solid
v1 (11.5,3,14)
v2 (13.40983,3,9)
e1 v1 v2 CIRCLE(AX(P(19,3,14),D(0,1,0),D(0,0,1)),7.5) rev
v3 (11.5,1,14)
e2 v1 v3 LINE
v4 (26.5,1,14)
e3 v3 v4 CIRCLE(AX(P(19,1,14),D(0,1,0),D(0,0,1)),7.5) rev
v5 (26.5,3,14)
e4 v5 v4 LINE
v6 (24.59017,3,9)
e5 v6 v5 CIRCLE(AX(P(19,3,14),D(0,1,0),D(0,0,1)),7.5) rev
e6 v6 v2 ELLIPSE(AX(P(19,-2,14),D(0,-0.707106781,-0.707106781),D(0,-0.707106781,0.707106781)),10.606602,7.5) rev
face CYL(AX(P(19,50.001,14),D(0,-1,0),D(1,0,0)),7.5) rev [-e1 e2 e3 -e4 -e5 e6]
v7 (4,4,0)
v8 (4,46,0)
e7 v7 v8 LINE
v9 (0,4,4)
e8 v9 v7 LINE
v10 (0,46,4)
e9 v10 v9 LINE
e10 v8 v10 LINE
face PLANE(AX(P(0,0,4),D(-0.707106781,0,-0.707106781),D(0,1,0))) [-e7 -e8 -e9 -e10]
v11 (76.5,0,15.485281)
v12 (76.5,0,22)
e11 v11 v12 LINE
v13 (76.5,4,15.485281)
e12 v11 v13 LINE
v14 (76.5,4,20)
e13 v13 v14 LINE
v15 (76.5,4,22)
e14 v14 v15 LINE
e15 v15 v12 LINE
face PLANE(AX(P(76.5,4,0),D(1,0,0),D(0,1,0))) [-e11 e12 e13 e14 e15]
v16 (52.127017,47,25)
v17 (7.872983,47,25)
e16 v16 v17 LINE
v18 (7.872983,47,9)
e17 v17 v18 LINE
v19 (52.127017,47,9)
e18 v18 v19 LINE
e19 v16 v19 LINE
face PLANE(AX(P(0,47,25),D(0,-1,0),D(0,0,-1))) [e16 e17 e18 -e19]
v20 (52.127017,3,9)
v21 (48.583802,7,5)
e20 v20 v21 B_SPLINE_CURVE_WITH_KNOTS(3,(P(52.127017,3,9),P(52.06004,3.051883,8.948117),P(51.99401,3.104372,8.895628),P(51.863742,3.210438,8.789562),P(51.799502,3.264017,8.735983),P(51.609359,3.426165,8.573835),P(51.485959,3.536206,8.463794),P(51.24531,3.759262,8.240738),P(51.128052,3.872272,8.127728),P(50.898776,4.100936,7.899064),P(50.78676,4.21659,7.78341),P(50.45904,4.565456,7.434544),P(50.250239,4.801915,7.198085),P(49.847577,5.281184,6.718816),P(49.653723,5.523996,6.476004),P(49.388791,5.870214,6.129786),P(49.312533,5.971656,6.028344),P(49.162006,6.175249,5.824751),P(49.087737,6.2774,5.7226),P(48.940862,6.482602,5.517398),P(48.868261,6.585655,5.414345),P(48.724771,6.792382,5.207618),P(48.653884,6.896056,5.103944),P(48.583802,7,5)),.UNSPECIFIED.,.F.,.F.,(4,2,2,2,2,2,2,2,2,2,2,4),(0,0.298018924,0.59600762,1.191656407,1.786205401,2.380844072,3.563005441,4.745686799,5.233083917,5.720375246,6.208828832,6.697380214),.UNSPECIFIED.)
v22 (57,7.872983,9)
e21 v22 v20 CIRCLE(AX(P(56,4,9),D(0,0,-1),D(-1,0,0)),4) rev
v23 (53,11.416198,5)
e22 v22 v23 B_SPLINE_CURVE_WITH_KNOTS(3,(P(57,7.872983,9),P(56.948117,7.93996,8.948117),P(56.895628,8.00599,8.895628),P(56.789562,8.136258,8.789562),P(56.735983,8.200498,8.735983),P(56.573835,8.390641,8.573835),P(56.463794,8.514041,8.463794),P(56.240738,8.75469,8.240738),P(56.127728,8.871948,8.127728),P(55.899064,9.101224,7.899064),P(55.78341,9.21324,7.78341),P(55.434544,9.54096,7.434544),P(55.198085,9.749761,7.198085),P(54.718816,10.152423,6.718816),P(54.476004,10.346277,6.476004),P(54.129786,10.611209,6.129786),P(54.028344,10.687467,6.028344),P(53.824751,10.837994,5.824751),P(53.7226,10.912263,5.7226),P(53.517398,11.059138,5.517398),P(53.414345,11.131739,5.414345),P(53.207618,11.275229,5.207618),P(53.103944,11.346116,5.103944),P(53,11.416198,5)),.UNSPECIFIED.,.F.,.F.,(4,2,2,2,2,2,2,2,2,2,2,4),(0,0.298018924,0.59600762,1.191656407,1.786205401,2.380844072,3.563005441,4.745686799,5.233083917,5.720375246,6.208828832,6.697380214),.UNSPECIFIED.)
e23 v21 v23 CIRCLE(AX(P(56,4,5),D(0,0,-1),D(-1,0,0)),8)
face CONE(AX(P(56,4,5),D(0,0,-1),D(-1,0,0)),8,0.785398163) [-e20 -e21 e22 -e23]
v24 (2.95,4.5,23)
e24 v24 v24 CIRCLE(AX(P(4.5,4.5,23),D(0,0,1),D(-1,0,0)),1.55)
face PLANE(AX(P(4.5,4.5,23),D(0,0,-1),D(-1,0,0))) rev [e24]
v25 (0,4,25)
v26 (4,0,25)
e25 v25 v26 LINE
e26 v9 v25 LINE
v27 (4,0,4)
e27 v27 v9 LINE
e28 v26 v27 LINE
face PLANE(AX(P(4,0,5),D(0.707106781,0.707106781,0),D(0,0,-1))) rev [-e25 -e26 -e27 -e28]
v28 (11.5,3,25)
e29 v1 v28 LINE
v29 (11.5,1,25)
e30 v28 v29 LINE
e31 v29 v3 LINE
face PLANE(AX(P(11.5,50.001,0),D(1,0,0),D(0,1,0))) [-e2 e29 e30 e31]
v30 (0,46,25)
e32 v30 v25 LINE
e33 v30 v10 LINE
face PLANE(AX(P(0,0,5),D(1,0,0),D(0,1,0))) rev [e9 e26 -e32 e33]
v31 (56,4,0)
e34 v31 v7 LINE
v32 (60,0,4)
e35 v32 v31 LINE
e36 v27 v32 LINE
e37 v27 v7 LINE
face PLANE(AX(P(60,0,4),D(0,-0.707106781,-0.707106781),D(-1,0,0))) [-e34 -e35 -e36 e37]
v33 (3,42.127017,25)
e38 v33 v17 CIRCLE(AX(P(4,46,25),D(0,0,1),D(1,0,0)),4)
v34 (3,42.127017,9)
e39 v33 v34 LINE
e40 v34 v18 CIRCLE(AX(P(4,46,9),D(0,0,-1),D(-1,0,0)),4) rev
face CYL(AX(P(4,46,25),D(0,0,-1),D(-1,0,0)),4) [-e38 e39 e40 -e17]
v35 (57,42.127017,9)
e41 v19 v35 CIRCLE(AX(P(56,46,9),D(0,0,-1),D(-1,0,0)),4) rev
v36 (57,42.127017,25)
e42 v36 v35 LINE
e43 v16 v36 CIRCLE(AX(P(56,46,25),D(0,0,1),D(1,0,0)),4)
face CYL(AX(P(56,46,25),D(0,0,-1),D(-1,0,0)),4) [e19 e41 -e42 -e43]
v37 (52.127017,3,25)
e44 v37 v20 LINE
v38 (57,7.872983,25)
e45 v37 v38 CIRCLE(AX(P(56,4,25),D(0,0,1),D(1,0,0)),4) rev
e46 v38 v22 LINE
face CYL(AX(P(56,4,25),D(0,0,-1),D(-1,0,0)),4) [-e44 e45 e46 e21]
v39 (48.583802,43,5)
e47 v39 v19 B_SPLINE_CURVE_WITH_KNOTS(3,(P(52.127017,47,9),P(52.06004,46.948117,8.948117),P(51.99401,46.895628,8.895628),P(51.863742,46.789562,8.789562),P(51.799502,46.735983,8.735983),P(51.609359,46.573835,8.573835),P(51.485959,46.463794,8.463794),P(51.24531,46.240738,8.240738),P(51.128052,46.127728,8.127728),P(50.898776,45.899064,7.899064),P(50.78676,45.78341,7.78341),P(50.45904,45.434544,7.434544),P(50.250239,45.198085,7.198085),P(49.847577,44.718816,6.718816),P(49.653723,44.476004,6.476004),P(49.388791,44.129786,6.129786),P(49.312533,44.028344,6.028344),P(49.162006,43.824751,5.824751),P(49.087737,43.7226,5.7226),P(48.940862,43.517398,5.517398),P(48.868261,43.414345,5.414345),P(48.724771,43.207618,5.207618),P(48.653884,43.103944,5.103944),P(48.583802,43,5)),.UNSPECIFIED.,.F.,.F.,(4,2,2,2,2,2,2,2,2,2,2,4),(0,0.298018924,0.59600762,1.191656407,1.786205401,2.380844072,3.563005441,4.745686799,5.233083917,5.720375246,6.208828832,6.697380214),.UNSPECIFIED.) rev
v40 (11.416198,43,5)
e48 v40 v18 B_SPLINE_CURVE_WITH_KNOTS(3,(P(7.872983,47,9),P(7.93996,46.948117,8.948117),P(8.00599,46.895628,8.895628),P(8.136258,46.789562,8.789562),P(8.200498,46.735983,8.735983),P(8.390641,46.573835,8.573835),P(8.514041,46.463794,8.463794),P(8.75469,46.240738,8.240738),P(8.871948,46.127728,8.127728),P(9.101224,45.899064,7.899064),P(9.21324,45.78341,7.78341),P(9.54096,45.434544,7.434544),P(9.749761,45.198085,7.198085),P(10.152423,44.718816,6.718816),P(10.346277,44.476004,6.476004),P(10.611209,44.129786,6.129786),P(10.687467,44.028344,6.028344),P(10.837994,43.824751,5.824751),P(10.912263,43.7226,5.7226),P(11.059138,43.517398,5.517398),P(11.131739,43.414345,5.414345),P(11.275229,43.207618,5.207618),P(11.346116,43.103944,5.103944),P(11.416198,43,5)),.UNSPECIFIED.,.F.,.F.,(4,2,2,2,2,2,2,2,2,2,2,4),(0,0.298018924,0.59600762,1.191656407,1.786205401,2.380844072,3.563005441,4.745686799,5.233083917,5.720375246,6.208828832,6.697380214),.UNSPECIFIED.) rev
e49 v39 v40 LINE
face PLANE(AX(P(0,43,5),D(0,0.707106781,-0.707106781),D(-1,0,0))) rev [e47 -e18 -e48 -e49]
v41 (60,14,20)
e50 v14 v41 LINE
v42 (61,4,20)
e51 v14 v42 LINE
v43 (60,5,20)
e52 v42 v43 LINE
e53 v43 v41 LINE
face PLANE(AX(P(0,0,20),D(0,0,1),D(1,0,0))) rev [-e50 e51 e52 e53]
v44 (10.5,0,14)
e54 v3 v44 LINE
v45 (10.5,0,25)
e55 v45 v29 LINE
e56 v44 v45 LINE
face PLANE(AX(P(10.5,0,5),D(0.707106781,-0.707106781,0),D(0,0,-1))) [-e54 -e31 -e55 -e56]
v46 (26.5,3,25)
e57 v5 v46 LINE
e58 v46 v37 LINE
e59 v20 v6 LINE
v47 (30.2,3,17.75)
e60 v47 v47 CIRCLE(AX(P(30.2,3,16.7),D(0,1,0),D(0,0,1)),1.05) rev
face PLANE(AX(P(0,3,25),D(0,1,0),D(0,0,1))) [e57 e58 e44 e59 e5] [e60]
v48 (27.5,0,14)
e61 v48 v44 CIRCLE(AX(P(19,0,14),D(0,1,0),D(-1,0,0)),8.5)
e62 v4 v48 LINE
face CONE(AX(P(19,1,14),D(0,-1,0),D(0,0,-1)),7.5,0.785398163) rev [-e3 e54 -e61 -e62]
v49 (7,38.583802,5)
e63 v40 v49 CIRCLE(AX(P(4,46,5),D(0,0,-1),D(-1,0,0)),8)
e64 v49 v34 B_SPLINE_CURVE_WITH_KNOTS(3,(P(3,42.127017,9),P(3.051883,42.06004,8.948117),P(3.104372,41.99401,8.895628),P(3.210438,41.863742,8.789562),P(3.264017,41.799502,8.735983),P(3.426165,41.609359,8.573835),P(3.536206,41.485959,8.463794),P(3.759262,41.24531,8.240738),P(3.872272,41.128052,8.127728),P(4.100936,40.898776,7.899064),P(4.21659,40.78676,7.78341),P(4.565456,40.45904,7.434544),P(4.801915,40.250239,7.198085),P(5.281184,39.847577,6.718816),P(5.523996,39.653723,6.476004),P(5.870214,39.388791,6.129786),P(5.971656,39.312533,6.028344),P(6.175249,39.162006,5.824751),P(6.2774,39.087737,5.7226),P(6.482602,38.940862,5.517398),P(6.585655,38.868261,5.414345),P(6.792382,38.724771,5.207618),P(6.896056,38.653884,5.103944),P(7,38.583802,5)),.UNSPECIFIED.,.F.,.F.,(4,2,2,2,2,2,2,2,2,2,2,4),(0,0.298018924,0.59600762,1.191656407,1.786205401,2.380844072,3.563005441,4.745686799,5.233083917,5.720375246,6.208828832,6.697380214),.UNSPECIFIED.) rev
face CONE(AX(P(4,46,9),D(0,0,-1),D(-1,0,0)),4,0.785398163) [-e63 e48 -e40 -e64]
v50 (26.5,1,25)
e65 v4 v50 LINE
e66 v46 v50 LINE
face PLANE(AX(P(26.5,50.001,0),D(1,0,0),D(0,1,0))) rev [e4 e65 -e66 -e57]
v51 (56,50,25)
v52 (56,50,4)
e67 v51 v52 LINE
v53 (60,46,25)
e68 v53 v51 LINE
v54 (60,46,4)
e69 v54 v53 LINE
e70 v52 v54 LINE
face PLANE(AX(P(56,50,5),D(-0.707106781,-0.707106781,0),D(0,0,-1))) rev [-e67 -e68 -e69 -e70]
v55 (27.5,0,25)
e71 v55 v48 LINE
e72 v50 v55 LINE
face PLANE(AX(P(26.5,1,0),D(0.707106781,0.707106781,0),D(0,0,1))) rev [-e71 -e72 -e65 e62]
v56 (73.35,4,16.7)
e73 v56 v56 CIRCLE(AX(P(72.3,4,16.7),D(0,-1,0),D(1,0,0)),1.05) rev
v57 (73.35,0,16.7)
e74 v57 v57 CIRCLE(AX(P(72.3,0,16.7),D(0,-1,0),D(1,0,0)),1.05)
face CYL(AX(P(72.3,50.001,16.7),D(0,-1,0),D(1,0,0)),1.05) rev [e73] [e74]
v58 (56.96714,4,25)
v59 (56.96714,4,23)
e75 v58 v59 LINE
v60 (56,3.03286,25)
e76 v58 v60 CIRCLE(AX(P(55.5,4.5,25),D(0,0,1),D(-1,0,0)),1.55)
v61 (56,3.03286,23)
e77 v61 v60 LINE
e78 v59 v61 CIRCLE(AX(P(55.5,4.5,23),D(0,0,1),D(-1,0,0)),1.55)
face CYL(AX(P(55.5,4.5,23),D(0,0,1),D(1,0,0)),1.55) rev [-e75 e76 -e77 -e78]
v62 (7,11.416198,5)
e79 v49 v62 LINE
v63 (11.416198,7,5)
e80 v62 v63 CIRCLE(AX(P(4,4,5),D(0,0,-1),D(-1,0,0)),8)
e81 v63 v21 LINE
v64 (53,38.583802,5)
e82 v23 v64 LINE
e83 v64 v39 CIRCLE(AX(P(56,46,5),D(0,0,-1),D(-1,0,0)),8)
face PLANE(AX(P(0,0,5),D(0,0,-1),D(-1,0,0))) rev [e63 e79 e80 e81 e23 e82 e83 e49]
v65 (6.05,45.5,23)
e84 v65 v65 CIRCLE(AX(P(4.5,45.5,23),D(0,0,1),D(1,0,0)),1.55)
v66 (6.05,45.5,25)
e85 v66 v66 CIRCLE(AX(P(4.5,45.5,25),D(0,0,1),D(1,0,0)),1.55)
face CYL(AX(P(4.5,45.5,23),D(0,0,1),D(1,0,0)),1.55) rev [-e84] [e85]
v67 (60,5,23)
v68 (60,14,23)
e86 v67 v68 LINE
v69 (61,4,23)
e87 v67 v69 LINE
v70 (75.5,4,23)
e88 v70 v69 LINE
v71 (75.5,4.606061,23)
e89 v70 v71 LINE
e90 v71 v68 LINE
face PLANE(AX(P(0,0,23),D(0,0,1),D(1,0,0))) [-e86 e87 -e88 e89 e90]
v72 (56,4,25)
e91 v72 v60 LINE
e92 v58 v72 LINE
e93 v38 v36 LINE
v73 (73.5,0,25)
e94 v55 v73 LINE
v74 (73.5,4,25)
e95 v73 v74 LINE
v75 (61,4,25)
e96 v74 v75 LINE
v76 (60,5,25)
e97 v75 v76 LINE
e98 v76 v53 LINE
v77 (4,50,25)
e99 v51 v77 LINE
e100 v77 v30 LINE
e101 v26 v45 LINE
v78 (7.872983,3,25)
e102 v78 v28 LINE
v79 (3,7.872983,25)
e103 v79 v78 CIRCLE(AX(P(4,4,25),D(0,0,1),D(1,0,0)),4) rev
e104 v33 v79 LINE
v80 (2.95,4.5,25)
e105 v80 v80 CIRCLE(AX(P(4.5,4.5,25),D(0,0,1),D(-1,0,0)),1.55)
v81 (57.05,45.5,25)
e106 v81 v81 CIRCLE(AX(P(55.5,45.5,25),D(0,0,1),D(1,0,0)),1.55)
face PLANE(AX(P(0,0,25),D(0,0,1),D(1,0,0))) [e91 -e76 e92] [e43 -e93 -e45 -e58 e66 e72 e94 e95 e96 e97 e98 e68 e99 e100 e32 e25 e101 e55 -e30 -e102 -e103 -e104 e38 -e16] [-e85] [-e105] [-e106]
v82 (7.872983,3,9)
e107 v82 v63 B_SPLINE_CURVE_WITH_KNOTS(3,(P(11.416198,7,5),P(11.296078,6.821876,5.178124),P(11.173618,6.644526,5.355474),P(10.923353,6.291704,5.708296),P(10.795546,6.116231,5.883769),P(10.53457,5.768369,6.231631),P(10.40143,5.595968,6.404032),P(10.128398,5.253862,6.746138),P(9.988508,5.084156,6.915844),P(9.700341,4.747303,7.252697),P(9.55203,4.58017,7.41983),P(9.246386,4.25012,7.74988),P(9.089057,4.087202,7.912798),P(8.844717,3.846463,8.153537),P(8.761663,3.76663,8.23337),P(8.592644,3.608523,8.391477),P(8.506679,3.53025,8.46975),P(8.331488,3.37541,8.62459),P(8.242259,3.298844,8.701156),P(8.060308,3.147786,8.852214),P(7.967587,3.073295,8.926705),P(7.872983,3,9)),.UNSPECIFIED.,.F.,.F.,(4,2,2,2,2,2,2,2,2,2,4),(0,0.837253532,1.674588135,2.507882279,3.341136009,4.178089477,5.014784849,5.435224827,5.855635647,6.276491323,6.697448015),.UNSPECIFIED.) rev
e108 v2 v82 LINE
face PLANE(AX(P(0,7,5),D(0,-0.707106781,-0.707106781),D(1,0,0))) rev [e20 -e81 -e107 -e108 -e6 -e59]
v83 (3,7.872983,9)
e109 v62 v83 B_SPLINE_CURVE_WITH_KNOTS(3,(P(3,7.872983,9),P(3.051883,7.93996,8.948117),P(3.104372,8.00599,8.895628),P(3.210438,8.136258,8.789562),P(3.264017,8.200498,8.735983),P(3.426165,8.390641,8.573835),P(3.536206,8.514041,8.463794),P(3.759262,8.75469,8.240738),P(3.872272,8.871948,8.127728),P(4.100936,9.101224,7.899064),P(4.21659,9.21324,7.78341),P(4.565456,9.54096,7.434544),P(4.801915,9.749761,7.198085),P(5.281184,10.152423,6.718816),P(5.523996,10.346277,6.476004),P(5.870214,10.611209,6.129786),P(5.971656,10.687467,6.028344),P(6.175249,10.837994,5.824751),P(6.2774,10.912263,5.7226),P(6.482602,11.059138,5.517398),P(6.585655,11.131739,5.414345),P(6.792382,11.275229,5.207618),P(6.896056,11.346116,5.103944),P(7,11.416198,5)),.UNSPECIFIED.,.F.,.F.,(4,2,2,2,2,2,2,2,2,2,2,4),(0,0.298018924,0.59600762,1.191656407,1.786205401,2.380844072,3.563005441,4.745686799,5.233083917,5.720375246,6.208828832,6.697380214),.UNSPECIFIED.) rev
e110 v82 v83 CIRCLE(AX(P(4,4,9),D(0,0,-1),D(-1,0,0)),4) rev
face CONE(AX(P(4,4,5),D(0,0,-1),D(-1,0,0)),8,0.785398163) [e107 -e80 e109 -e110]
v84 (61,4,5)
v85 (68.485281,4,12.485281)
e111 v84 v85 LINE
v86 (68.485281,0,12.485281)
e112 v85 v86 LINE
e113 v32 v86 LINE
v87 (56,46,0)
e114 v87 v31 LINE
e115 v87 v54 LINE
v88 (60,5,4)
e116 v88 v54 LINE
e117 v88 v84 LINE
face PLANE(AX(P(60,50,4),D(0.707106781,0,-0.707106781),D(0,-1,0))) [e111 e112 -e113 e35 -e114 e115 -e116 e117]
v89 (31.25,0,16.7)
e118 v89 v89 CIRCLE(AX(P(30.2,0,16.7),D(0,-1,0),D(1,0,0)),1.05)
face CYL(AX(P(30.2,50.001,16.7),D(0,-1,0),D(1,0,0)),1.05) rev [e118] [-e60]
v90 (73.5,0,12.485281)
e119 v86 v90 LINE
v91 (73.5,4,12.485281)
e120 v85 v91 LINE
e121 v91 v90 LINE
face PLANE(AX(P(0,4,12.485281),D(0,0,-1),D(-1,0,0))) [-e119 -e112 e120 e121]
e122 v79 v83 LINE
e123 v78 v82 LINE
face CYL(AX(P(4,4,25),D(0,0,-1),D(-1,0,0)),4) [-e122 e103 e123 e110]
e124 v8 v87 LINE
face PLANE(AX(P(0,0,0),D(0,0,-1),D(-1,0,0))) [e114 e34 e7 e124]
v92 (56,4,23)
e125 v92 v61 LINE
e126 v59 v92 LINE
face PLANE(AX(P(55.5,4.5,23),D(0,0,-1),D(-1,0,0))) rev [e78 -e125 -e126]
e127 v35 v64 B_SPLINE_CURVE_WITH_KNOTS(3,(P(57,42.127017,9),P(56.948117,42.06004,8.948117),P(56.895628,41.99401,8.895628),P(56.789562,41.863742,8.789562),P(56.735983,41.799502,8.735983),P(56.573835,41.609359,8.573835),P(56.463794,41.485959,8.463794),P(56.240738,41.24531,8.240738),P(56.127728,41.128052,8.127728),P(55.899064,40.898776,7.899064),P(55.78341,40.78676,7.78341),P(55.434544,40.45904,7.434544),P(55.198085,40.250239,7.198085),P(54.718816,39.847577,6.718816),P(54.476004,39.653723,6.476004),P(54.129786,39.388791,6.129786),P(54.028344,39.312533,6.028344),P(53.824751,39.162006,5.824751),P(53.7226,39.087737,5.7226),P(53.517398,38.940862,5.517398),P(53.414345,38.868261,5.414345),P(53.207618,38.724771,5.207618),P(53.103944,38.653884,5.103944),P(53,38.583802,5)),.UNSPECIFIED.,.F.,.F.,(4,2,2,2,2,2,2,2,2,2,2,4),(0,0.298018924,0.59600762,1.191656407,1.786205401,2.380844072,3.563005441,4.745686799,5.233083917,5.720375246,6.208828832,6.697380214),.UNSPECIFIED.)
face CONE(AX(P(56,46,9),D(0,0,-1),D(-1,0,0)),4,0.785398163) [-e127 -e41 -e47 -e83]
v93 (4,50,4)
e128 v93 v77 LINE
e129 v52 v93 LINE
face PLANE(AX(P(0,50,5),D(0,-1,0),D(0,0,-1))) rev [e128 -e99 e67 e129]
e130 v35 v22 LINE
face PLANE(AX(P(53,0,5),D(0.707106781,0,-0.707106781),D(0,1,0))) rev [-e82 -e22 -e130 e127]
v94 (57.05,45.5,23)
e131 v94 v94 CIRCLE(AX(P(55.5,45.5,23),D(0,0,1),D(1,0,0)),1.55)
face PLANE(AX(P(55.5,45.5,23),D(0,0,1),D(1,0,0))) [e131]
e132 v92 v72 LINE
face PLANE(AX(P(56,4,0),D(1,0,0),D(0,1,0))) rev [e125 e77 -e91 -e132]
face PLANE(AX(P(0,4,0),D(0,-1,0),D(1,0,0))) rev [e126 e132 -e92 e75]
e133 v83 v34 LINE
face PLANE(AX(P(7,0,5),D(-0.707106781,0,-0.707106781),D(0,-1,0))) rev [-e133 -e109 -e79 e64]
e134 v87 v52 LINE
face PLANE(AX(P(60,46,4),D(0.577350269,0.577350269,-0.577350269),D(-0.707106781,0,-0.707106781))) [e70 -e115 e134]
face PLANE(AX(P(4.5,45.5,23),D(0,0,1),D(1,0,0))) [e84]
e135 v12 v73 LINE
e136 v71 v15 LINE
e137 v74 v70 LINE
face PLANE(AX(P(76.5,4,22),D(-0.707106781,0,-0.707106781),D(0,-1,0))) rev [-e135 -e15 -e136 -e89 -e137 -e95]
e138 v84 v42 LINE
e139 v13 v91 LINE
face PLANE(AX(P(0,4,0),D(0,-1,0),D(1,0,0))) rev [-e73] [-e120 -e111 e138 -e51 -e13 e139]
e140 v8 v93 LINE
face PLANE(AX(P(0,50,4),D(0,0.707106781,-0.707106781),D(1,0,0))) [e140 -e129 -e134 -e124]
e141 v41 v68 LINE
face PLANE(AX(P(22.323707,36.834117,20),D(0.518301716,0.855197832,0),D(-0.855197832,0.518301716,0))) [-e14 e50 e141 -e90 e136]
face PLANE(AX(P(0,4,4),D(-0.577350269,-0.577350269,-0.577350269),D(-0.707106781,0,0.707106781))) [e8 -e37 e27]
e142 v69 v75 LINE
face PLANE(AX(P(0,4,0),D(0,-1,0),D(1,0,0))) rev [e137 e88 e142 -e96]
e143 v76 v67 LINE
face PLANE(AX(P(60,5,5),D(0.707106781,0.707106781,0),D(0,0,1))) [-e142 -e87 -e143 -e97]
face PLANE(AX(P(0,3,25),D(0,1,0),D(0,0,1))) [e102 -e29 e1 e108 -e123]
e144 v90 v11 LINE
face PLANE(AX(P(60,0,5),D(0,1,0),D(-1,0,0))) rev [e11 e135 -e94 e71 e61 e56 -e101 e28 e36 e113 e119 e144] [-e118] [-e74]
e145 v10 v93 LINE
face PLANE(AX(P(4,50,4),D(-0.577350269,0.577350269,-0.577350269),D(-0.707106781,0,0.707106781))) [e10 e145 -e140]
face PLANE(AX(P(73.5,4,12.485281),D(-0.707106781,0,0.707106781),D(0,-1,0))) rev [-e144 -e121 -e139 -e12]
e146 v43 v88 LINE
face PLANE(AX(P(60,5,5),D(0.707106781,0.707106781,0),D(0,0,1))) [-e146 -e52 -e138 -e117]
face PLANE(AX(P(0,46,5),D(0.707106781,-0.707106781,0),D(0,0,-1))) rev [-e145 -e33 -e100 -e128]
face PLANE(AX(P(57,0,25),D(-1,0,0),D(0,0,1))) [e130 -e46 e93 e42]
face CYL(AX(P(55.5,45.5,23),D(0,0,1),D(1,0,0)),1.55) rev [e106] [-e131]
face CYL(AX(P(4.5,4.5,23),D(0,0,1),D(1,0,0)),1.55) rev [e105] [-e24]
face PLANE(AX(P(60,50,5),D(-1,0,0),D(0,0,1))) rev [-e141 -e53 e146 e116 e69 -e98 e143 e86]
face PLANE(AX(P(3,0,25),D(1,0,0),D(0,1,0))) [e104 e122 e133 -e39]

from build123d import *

# Parameters (mm, degrees)
BOSS_EXTRUDE1_DEPTH = 5
BOSS_EXTRUDE2_DEPTH = 20
CHAMFER1_SIZE       = 4
CHAMFER2_SIZE       = 4
CUT_EXTRUDE1_REACH  = 84.006
SKETCH3_R           = 7.5
SKETCH5_R           = 1.550000000000001
SKETCH5_R_2         = 1.5500000000000018
SKETCH5_R_3         = 1.5500000000000012
SKETCH5_R_4         = 1.5500000000000003
CUT_EXTRUDE2_DEPTH  = 2
CHAMFER3_SIZE       = 1
BOSS_EXTRUDE3_DEPTH = 4
CUT_EXTRUDE3_REACH  = 81.126
CUT_EXTRUDE5_REACH  = 96.748
SKETCH10_R          = 1.050000000000002
SKETCH10_R_2        = 1.0499999999999956
BOSS_EXTRUDE5_DEPTH = 3
CHAMFER6_SIZE       = 1
CHAMFER7_SIZE       = 3


with BuildPart() as part:
    # Sketch1 → Boss-Extrude1 (new body)
    with BuildSketch(Plane.XY):
        Polygon((0, 0), (3.28e-15, 50), (60, 50), (60, -1.4e-16), align=None)
    extrude(amount=BOSS_EXTRUDE1_DEPTH)

    # Sketch2 → Boss-Extrude2 (add)
    with BuildSketch(Plane.XY.offset(5)):
        with BuildLine():
            Line((7.872983346207448, 47), (52.127016653792545, 47))
            ThreePointArc((52.12701665379256, 46.99999999999996), (53.55051025721673, 49.16227766016832), (55.99999999999984, 50.00000000000001))
            Line((55.99999999999984, 50), (3.9999999999998224, 50))
            ThreePointArc((3.999999999999821, 50), (6.449489742783131, 49.16227766016842), (7.872983346207436, 46.99999999999996))
        make_face()
        with BuildLine():
            ThreePointArc((0, 46), (1.1715728752537458, 48.82842712474613), (3.999999999999821, 50))
            Line((3.9999999999998224, 50), (0, 50))
            Line((3.28e-15, 50), (3.02e-15, 46))
        make_face()
        with BuildLine():
            ThreePointArc((8.000000000000007, 46), (7.968118785068677, 46.50401716993089), (7.872983346207436, 46.99999999999996))
            Line((7.872983346207448, 47), (3.000000000000007, 47))
            Line((3.0000000000000036, 47), (3.000000000000003, 42.12701665379265))
            ThreePointArc((2.999999999999857, 42.127016653792616), (6.4494897427831255, 42.83772233983157), (8.000000000000007, 46))
        make_face()
        with BuildLine():
            Line((3.000000000000007, 47), (7.872983346207448, 47))
            ThreePointArc((7.872983346207436, 46.99999999999996), (6.449489742783131, 49.16227766016842), (3.999999999999821, 50))
            ThreePointArc((3.999999999999821, 50), (1.1715728752537458, 48.82842712474613), (0, 46))
            ThreePointArc((0, 46), (0.8377223398315752, 43.55051025721688), (2.999999999999857, 42.127016653792616))
            Line((3.000000000000003, 42.12701665379265), (3.0000000000000036, 47))
        make_face()
        with BuildLine():
            ThreePointArc((-1.78e-15, 3.9999999936735127), (0.8377223378945806, 6.449489740282477), (3.0000000000001434, 7.8729833462074605))
            Line((3.000000000000001, 7.872983346207491), (3.000000000000003, 42.12701665379265))
            ThreePointArc((2.999999999999857, 42.127016653792616), (0.8377223398315752, 43.55051025721688), (0, 46))
            Line((3.02e-15, 46), (2.6e-16, 3.999999993673512))
        make_face()
        with BuildLine():
            ThreePointArc((8.000000000000007, 46), (7.968118785068677, 46.50401716993089), (7.872983346207436, 46.99999999999996))
            Line((7.872983346207448, 47), (3.000000000000007, 47))
            Line((3.0000000000000036, 47), (3.000000000000003, 42.12701665379265))
            ThreePointArc((2.999999999999857, 42.127016653792616), (6.4494897427831255, 42.83772233983157), (8.000000000000007, 46))
        make_face()
        with BuildLine():
            Line((3.000000000000007, 47), (7.872983346207448, 47))
            ThreePointArc((7.872983346207436, 46.99999999999996), (6.449489742783131, 49.16227766016842), (3.999999999999821, 50))
            ThreePointArc((3.999999999999821, 50), (1.1715728752537458, 48.82842712474613), (0, 46))
            ThreePointArc((0, 46), (0.8377223398315752, 43.55051025721688), (2.999999999999857, 42.127016653792616))
            Line((3.000000000000003, 42.12701665379265), (3.0000000000000036, 47))
        make_face()
        with BuildLine():
            ThreePointArc((3.999999999999755, 8.9e-16), (6.449489742783102, 0.8377223398315614), (7.872983346207432, 3.0000000000000497))
            Line((7.8729833462074446, 3), (3.0000000000000004, 3))
            Line((3.0000000000000004, 3), (3.000000000000001, 7.872983346207491))
            ThreePointArc((3.0000000000001434, 7.8729833462074605), (0.8377223378945806, 6.449489740282477), (-1.78e-15, 3.9999999936735127))
            ThreePointArc((-1.78e-15, 3.9999999936735127), (1.1715728774904743, 1.1715728730171464), (3.999999999999755, 8.9e-16))
        make_face()
        with BuildLine():
            Line((3.0000000000000004, 3), (7.8729833462074446, 3))
            ThreePointArc((7.872983346207432, 3.0000000000000497), (7.968118785068674, 3.4959828300691127), (8.000000000000004, 4.000000000000003))
            ThreePointArc((8.000000000000004, 4.0000000000000036), (6.449489742783239, 7.16227766016834), (3.0000000000001434, 7.8729833462074605))
            Line((3.000000000000001, 7.872983346207491), (3.0000000000000004, 3))
        make_face()
        with BuildLine():
            Line((0, 0), (3.999999999999755, -1e-17))
            ThreePointArc((3.999999999999755, 8.9e-16), (1.1715728774904743, 1.1715728730171464), (-1.78e-15, 3.9999999936735127))
            Line((2.6e-16, 3.999999993673512), (0, 0))
        make_face()
        with BuildLine():
            ThreePointArc((55.99999999999975, -1.066e-14), (53.55051025721669, 0.8377223398317017), (52.12701665379255, 3.0000000000000497))
            Line((52.12701665379255, 3), (7.8729833462074446, 3))
            ThreePointArc((7.872983346207432, 3.0000000000000497), (6.449489742783102, 0.8377223398315614), (3.999999999999755, 8.9e-16))
            Line((3.999999999999755, -1e-17), (55.99999999999976, -1.3e-16))
        make_face()
        with BuildLine():
            ThreePointArc((3.999999999999755, 8.9e-16), (6.449489742783102, 0.8377223398315614), (7.872983346207432, 3.0000000000000497))
            Line((7.8729833462074446, 3), (3.0000000000000004, 3))
            Line((3.0000000000000004, 3), (3.000000000000001, 7.872983346207491))
            ThreePointArc((3.0000000000001434, 7.8729833462074605), (0.8377223378945806, 6.449489740282477), (-1.78e-15, 3.9999999936735127))
            ThreePointArc((-1.78e-15, 3.9999999936735127), (1.1715728774904743, 1.1715728730171464), (3.999999999999755, 8.9e-16))
        make_face()
        with BuildLine():
            Line((3.0000000000000004, 3), (7.8729833462074446, 3))
            ThreePointArc((7.872983346207432, 3.0000000000000497), (7.968118785068674, 3.4959828300691127), (8.000000000000004, 4.000000000000003))
            ThreePointArc((8.000000000000004, 4.0000000000000036), (6.449489742783239, 7.16227766016834), (3.0000000000001434, 7.8729833462074605))
            Line((3.000000000000001, 7.872983346207491), (3.0000000000000004, 3))
        make_face()
        with BuildLine():
            Line((52.127016653792545, 3), (56.99999999999999, 3))
            Line((56.99999999999999, 3), (56.99999999999999, 7.872983346207451))
            ThreePointArc((56.99999999999993, 7.872983346207436), (53.171572875253794, 6.828427124746189), (52.12701665379255, 3.0000000000000497))
        make_face()
        with BuildLine():
            Line((56.99999999999999, 7.872983346207451), (56.99999999999999, 3))
            Line((56.99999999999999, 3), (52.127016653792545, 3))
            ThreePointArc((52.12701665379255, 3.0000000000000497), (53.55051025721669, 0.8377223398317017), (55.99999999999975, -1.066e-14))
            ThreePointArc((55.99999999999975, -1.066e-14), (58.8284271247461, 1.1715728752537156), (60, 3.9999999999999956))
            ThreePointArc((60, 3.9999999999999964), (59.16227766016836, 6.4494897427832045), (56.99999999999993, 7.872983346207436))
        make_face()
        with BuildLine():
            Line((60, -1.4e-16), (60, 3.9999999999999964))
            ThreePointArc((60, 3.9999999999999956), (58.8284271247461, 1.1715728752537156), (55.99999999999975, -1.066e-14))
            Line((55.99999999999975, -1.3e-16), (60, -1.4e-16))
        make_face()
        with BuildLine():
            Line((52.127016653792545, 3), (56.99999999999999, 3))
            Line((56.99999999999999, 3), (56.99999999999999, 7.872983346207451))
            ThreePointArc((56.99999999999993, 7.872983346207436), (53.171572875253794, 6.828427124746189), (52.12701665379255, 3.0000000000000497))
        make_face()
        with BuildLine():
            Line((56.99999999999999, 7.872983346207451), (56.99999999999999, 3))
            Line((56.99999999999999, 3), (52.127016653792545, 3))
            ThreePointArc((52.12701665379255, 3.0000000000000497), (53.55051025721669, 0.8377223398317017), (55.99999999999975, -1.066e-14))
            ThreePointArc((55.99999999999975, -1.066e-14), (58.8284271247461, 1.1715728752537156), (60, 3.9999999999999956))
            ThreePointArc((60, 3.9999999999999964), (59.16227766016836, 6.4494897427832045), (56.99999999999993, 7.872983346207436))
        make_face()
        with BuildLine():
            Line((56.99999999999999, 42.127016653792545), (56.99999999999999, 7.872983346207451))
            ThreePointArc((56.99999999999993, 7.872983346207436), (59.16227766016836, 6.4494897427832045), (60, 3.9999999999999964))
            Line((60, 3.9999999999999964), (60, 46))
            ThreePointArc((60, 46), (59.16227766016836, 43.55051025721679), (56.99999999999993, 42.12701665379256))
        make_face()
        with BuildLine():
            ThreePointArc((55.99999999999984, 50.00000000000001), (58.828427124746135, 48.82842712474625), (60, 46))
            Line((60, 46), (60, 50))
            Line((60, 50), (55.99999999999984, 50))
        make_face()
        with BuildLine():
            ThreePointArc((52.12701665379256, 46.99999999999996), (53.171572875253794, 43.171572875253815), (56.99999999999993, 42.12701665379256))
            Line((56.99999999999999, 42.127016653792545), (56.99999999999999, 47))
            Line((56.99999999999999, 47), (52.127016653792545, 47))
        make_face()
        with BuildLine():
            Line((56.99999999999999, 47), (56.99999999999999, 42.127016653792545))
            ThreePointArc((56.99999999999993, 42.12701665379256), (59.16227766016836, 43.55051025721679), (60, 46))
            ThreePointArc((60, 46), (58.828427124746135, 48.82842712474625), (55.99999999999984, 50.00000000000001))
            ThreePointArc((55.99999999999984, 50.00000000000001), (53.55051025721673, 49.16227766016832), (52.12701665379256, 46.99999999999996))
            Line((52.127016653792545, 47), (56.99999999999999, 47))
        make_face()
        with BuildLine():
            ThreePointArc((52.12701665379256, 46.99999999999996), (53.171572875253794, 43.171572875253815), (56.99999999999993, 42.12701665379256))
            Line((56.99999999999999, 42.127016653792545), (56.99999999999999, 47))
            Line((56.99999999999999, 47), (52.127016653792545, 47))
        make_face()
        with BuildLine():
            Line((56.99999999999999, 47), (56.99999999999999, 42.127016653792545))
            ThreePointArc((56.99999999999993, 42.12701665379256), (59.16227766016836, 43.55051025721679), (60, 46))
            ThreePointArc((60, 46), (58.828427124746135, 48.82842712474625), (55.99999999999984, 50.00000000000001))
            ThreePointArc((55.99999999999984, 50.00000000000001), (53.55051025721673, 49.16227766016832), (52.12701665379256, 46.99999999999996))
            Line((52.127016653792545, 47), (56.99999999999999, 47))
        make_face()
    extrude(amount=BOSS_EXTRUDE2_DEPTH)

    # Chamfer1
    chamfer1_edges = [part.edges().sort_by_distance(p)[0] for p in [
        (6.828427124746156, 43.171572875253766, 5),
        (53.171572875253794, 43.171572875253815, 5),
        (53.171572875253794, 6.828427124746188, 5),
        (56.99999999999999, 24.999999999999996, 5),
        (29.999999999999996, 47, 5),
        (2.999999999999961, 25.000000000000057, 5),
        (6.828427124746214, 6.828427124746155, 5),
        (30, 3, 5),
    ]]
    chamfer(chamfer1_edges, length=CHAMFER1_SIZE)

    # Chamfer2
    chamfer2_edges = [part.edges().sort_by_distance(p)[0] for p in [
        (1.64e-15, 25, 0),
        (30.000000000000004, 50, 0),
        (60, 25, 0),
        (30, -7e-17, 0),
        (0, 0, 12.5),
        (2.46e-15, 50, 12.5),
        (60, 50, 12.5),
        (60, -1.4e-16, 12.5),
    ]]
    chamfer(chamfer2_edges, length=CHAMFER2_SIZE)

    # Sketch3 → Cut-Extrude1 (cut, up to next)
    with BuildSketch(Plane.XZ, mode=Mode.PRIVATE) as cut_extrude1_sk1:
        with BuildLine():
            Line((11.499999999999982, 25), (11.499999999999982, 14.000000000000004))
            ThreePointArc((11.499999999999982, 14.000000000000007), (18.999999999999986, 21.500000000000004), (26.499999999999982, 14.000000000000004))
            Line((26.499999999999982, 14.000000000000004), (26.499999999999982, 25))
            Line((26.499999999999982, 25), (11.499999999999982, 25))
        make_face()
    cut_extrude1_tool1 = extrude(cut_extrude1_sk1.sketch, amount=-CUT_EXTRUDE1_REACH, mode=Mode.PRIVATE) & part.part
    # Sketch3 → Cut-Extrude1 (cut, up to next)
    with BuildSketch(Plane.XZ, mode=Mode.PRIVATE) as cut_extrude1_sk2:
        with Locations((18.999999999999982, 14.000000000000004)):
            Circle(SKETCH3_R)
    cut_extrude1_tool2 = extrude(cut_extrude1_sk2.sketch, amount=-CUT_EXTRUDE1_REACH, mode=Mode.PRIVATE) & part.part
    add(cut_extrude1_tool1.solids().sort_by_distance((19, 0, 22.171032))[0], mode=Mode.SUBTRACT)
    add(cut_extrude1_tool2.solids().sort_by_distance((19, 0, 14))[0], mode=Mode.SUBTRACT)

    # Sketch5 → Cut-Extrude2 (cut)
    with BuildSketch(Plane.XY.offset(25)):
        with Locations((4.5, 45.50000000000001)):
            Circle(SKETCH5_R)
        with Locations((55.5, 45.50000000000001)):
            Circle(SKETCH5_R_2)
        with Locations(Location((55.5, 4.49999999999999, 0), (0, 0, 180))):
            Circle(SKETCH5_R_3)
        with Locations(Location((4.499999999999998, 4.499999999999997, 0), (0, 0, 180))):
            Circle(SKETCH5_R_4)
    extrude(amount=-CUT_EXTRUDE2_DEPTH, mode=Mode.SUBTRACT)

    # Chamfer3
    chamfer3_edges = [part.edges().sort_by_distance(p)[0] for p in [
        (18.999999999999982, -4e-17, 6.5000000000000036),
        (26.499999999999982, -6e-17, 19.5),
        (11.499999999999982, -3e-17, 19.5),
    ]]
    chamfer(chamfer3_edges, length=CHAMFER3_SIZE)

    # Sketch6 → Boss-Extrude3 (add)
    with BuildSketch(Plane.XZ):
        Polygon((76.49999999999997, 25), (56.00000000000001, 25), (55.99999999999999, 0), (68.4852813742386, 12.48528137423854), (76.49999999999997, 12.48528137423853), align=None)
    extrude(amount=-BOSS_EXTRUDE3_DEPTH)

    # Sketch7 → Cut-Extrude3 (cut, up to next)
    with BuildSketch(Plane.ZY.offset(-56.000000000000014), mode=Mode.PRIVATE) as cut_extrude3_sk1:
        Polygon((3.9999999999999827, 6e-17), (0, 4.0000000000000036), (6.94e-15, 0), align=None)
    cut_extrude3_tool1 = extrude(cut_extrude3_sk1.sketch, amount=-CUT_EXTRUDE3_REACH, mode=Mode.PRIVATE) & part.part
    add(cut_extrude3_tool1.solids().sort_by_distance((56, 1.333333, 1.333333))[0], mode=Mode.SUBTRACT)

    # Sketch10 → Cut-Extrude5 (cut, up to next)
    with BuildSketch(Plane.XZ, mode=Mode.PRIVATE) as cut_extrude5_sk1:
        with Locations((72.29999999999998, 16.70000000000001)):
            Circle(SKETCH10_R)
    cut_extrude5_tool1 = extrude(cut_extrude5_sk1.sketch, amount=-CUT_EXTRUDE5_REACH, mode=Mode.PRIVATE) & part.part
    # Sketch10 → Cut-Extrude5 (cut, up to next)
    with BuildSketch(Plane.XZ, mode=Mode.PRIVATE) as cut_extrude5_sk2:
        with Locations((30.199999999999992, 16.700000000000024)):
            Circle(SKETCH10_R_2)
    cut_extrude5_tool2 = extrude(cut_extrude5_sk2.sketch, amount=-CUT_EXTRUDE5_REACH, mode=Mode.PRIVATE) & part.part
    add(cut_extrude5_tool1.solids().sort_by_distance((72.3, 0, 16.7))[0], mode=Mode.SUBTRACT)
    add(cut_extrude5_tool2.solids().sort_by_distance((30.2, 0, 16.7))[0], mode=Mode.SUBTRACT)

    # Sketch11 → Boss-Extrude5 (add)
    with BuildSketch(Plane.XY.offset(23)):
        Polygon((76.49999999999997, 3), (76.49999999999997, 4), (59.99999999999999, 4), (59.99999999999999, 14), (58.99999999999999, 14), (58.99999999999999, 3), align=None)
        Polygon((59.99999999999999, 4), (76.49999999999997, 4), (59.99999999999999, 14), align=None)
    extrude(amount=-BOSS_EXTRUDE5_DEPTH)

    # Chamfer6
    chamfer6_edges = [part.edges().sort_by_distance(p)[0] for p in [
        (60, 4, 12),
        (60, 4, 24),
    ]]
    chamfer(chamfer6_edges, length=CHAMFER6_SIZE)

    # Chamfer7
    # the kernel refuses this chamfer: 3 mm, written as the material it takes off along each edge
    with BuildSketch(Plane(origin=(76.49999999999997, -7.715048963897736, 25), x_dir=(-0.9996219169112965, 0, 0.02749587661058676), z_dir=(0, 1, 0))) as chamfer7_piece_1:
        Polygon((CHAMFER7_SIZE * 0.999621916911, -CHAMFER7_SIZE * 0.0274958766106), (-CHAMFER7_SIZE * 0.0274958766106, -CHAMFER7_SIZE * 0.999621916911), (0, 0), align=None)
    extrude(amount=19.430097927795472, mode=Mode.SUBTRACT)
    with BuildSketch(Plane(origin=(76.49999999999997, -7.715048963897734, 12.48528137423853), x_dir=(0.02749587661058678, 0, 0.9996219169112968), z_dir=(0, 1, 0))) as chamfer7_piece_2:
        Polygon((CHAMFER7_SIZE * 0.999621916911, -CHAMFER7_SIZE * 0.0274958766106), (-CHAMFER7_SIZE * 0.0274958766106, -CHAMFER7_SIZE * 0.999621916911), (0, 0), align=None)
    extrude(amount=19.43009792779547, mode=Mode.SUBTRACT)


solid = part.part
